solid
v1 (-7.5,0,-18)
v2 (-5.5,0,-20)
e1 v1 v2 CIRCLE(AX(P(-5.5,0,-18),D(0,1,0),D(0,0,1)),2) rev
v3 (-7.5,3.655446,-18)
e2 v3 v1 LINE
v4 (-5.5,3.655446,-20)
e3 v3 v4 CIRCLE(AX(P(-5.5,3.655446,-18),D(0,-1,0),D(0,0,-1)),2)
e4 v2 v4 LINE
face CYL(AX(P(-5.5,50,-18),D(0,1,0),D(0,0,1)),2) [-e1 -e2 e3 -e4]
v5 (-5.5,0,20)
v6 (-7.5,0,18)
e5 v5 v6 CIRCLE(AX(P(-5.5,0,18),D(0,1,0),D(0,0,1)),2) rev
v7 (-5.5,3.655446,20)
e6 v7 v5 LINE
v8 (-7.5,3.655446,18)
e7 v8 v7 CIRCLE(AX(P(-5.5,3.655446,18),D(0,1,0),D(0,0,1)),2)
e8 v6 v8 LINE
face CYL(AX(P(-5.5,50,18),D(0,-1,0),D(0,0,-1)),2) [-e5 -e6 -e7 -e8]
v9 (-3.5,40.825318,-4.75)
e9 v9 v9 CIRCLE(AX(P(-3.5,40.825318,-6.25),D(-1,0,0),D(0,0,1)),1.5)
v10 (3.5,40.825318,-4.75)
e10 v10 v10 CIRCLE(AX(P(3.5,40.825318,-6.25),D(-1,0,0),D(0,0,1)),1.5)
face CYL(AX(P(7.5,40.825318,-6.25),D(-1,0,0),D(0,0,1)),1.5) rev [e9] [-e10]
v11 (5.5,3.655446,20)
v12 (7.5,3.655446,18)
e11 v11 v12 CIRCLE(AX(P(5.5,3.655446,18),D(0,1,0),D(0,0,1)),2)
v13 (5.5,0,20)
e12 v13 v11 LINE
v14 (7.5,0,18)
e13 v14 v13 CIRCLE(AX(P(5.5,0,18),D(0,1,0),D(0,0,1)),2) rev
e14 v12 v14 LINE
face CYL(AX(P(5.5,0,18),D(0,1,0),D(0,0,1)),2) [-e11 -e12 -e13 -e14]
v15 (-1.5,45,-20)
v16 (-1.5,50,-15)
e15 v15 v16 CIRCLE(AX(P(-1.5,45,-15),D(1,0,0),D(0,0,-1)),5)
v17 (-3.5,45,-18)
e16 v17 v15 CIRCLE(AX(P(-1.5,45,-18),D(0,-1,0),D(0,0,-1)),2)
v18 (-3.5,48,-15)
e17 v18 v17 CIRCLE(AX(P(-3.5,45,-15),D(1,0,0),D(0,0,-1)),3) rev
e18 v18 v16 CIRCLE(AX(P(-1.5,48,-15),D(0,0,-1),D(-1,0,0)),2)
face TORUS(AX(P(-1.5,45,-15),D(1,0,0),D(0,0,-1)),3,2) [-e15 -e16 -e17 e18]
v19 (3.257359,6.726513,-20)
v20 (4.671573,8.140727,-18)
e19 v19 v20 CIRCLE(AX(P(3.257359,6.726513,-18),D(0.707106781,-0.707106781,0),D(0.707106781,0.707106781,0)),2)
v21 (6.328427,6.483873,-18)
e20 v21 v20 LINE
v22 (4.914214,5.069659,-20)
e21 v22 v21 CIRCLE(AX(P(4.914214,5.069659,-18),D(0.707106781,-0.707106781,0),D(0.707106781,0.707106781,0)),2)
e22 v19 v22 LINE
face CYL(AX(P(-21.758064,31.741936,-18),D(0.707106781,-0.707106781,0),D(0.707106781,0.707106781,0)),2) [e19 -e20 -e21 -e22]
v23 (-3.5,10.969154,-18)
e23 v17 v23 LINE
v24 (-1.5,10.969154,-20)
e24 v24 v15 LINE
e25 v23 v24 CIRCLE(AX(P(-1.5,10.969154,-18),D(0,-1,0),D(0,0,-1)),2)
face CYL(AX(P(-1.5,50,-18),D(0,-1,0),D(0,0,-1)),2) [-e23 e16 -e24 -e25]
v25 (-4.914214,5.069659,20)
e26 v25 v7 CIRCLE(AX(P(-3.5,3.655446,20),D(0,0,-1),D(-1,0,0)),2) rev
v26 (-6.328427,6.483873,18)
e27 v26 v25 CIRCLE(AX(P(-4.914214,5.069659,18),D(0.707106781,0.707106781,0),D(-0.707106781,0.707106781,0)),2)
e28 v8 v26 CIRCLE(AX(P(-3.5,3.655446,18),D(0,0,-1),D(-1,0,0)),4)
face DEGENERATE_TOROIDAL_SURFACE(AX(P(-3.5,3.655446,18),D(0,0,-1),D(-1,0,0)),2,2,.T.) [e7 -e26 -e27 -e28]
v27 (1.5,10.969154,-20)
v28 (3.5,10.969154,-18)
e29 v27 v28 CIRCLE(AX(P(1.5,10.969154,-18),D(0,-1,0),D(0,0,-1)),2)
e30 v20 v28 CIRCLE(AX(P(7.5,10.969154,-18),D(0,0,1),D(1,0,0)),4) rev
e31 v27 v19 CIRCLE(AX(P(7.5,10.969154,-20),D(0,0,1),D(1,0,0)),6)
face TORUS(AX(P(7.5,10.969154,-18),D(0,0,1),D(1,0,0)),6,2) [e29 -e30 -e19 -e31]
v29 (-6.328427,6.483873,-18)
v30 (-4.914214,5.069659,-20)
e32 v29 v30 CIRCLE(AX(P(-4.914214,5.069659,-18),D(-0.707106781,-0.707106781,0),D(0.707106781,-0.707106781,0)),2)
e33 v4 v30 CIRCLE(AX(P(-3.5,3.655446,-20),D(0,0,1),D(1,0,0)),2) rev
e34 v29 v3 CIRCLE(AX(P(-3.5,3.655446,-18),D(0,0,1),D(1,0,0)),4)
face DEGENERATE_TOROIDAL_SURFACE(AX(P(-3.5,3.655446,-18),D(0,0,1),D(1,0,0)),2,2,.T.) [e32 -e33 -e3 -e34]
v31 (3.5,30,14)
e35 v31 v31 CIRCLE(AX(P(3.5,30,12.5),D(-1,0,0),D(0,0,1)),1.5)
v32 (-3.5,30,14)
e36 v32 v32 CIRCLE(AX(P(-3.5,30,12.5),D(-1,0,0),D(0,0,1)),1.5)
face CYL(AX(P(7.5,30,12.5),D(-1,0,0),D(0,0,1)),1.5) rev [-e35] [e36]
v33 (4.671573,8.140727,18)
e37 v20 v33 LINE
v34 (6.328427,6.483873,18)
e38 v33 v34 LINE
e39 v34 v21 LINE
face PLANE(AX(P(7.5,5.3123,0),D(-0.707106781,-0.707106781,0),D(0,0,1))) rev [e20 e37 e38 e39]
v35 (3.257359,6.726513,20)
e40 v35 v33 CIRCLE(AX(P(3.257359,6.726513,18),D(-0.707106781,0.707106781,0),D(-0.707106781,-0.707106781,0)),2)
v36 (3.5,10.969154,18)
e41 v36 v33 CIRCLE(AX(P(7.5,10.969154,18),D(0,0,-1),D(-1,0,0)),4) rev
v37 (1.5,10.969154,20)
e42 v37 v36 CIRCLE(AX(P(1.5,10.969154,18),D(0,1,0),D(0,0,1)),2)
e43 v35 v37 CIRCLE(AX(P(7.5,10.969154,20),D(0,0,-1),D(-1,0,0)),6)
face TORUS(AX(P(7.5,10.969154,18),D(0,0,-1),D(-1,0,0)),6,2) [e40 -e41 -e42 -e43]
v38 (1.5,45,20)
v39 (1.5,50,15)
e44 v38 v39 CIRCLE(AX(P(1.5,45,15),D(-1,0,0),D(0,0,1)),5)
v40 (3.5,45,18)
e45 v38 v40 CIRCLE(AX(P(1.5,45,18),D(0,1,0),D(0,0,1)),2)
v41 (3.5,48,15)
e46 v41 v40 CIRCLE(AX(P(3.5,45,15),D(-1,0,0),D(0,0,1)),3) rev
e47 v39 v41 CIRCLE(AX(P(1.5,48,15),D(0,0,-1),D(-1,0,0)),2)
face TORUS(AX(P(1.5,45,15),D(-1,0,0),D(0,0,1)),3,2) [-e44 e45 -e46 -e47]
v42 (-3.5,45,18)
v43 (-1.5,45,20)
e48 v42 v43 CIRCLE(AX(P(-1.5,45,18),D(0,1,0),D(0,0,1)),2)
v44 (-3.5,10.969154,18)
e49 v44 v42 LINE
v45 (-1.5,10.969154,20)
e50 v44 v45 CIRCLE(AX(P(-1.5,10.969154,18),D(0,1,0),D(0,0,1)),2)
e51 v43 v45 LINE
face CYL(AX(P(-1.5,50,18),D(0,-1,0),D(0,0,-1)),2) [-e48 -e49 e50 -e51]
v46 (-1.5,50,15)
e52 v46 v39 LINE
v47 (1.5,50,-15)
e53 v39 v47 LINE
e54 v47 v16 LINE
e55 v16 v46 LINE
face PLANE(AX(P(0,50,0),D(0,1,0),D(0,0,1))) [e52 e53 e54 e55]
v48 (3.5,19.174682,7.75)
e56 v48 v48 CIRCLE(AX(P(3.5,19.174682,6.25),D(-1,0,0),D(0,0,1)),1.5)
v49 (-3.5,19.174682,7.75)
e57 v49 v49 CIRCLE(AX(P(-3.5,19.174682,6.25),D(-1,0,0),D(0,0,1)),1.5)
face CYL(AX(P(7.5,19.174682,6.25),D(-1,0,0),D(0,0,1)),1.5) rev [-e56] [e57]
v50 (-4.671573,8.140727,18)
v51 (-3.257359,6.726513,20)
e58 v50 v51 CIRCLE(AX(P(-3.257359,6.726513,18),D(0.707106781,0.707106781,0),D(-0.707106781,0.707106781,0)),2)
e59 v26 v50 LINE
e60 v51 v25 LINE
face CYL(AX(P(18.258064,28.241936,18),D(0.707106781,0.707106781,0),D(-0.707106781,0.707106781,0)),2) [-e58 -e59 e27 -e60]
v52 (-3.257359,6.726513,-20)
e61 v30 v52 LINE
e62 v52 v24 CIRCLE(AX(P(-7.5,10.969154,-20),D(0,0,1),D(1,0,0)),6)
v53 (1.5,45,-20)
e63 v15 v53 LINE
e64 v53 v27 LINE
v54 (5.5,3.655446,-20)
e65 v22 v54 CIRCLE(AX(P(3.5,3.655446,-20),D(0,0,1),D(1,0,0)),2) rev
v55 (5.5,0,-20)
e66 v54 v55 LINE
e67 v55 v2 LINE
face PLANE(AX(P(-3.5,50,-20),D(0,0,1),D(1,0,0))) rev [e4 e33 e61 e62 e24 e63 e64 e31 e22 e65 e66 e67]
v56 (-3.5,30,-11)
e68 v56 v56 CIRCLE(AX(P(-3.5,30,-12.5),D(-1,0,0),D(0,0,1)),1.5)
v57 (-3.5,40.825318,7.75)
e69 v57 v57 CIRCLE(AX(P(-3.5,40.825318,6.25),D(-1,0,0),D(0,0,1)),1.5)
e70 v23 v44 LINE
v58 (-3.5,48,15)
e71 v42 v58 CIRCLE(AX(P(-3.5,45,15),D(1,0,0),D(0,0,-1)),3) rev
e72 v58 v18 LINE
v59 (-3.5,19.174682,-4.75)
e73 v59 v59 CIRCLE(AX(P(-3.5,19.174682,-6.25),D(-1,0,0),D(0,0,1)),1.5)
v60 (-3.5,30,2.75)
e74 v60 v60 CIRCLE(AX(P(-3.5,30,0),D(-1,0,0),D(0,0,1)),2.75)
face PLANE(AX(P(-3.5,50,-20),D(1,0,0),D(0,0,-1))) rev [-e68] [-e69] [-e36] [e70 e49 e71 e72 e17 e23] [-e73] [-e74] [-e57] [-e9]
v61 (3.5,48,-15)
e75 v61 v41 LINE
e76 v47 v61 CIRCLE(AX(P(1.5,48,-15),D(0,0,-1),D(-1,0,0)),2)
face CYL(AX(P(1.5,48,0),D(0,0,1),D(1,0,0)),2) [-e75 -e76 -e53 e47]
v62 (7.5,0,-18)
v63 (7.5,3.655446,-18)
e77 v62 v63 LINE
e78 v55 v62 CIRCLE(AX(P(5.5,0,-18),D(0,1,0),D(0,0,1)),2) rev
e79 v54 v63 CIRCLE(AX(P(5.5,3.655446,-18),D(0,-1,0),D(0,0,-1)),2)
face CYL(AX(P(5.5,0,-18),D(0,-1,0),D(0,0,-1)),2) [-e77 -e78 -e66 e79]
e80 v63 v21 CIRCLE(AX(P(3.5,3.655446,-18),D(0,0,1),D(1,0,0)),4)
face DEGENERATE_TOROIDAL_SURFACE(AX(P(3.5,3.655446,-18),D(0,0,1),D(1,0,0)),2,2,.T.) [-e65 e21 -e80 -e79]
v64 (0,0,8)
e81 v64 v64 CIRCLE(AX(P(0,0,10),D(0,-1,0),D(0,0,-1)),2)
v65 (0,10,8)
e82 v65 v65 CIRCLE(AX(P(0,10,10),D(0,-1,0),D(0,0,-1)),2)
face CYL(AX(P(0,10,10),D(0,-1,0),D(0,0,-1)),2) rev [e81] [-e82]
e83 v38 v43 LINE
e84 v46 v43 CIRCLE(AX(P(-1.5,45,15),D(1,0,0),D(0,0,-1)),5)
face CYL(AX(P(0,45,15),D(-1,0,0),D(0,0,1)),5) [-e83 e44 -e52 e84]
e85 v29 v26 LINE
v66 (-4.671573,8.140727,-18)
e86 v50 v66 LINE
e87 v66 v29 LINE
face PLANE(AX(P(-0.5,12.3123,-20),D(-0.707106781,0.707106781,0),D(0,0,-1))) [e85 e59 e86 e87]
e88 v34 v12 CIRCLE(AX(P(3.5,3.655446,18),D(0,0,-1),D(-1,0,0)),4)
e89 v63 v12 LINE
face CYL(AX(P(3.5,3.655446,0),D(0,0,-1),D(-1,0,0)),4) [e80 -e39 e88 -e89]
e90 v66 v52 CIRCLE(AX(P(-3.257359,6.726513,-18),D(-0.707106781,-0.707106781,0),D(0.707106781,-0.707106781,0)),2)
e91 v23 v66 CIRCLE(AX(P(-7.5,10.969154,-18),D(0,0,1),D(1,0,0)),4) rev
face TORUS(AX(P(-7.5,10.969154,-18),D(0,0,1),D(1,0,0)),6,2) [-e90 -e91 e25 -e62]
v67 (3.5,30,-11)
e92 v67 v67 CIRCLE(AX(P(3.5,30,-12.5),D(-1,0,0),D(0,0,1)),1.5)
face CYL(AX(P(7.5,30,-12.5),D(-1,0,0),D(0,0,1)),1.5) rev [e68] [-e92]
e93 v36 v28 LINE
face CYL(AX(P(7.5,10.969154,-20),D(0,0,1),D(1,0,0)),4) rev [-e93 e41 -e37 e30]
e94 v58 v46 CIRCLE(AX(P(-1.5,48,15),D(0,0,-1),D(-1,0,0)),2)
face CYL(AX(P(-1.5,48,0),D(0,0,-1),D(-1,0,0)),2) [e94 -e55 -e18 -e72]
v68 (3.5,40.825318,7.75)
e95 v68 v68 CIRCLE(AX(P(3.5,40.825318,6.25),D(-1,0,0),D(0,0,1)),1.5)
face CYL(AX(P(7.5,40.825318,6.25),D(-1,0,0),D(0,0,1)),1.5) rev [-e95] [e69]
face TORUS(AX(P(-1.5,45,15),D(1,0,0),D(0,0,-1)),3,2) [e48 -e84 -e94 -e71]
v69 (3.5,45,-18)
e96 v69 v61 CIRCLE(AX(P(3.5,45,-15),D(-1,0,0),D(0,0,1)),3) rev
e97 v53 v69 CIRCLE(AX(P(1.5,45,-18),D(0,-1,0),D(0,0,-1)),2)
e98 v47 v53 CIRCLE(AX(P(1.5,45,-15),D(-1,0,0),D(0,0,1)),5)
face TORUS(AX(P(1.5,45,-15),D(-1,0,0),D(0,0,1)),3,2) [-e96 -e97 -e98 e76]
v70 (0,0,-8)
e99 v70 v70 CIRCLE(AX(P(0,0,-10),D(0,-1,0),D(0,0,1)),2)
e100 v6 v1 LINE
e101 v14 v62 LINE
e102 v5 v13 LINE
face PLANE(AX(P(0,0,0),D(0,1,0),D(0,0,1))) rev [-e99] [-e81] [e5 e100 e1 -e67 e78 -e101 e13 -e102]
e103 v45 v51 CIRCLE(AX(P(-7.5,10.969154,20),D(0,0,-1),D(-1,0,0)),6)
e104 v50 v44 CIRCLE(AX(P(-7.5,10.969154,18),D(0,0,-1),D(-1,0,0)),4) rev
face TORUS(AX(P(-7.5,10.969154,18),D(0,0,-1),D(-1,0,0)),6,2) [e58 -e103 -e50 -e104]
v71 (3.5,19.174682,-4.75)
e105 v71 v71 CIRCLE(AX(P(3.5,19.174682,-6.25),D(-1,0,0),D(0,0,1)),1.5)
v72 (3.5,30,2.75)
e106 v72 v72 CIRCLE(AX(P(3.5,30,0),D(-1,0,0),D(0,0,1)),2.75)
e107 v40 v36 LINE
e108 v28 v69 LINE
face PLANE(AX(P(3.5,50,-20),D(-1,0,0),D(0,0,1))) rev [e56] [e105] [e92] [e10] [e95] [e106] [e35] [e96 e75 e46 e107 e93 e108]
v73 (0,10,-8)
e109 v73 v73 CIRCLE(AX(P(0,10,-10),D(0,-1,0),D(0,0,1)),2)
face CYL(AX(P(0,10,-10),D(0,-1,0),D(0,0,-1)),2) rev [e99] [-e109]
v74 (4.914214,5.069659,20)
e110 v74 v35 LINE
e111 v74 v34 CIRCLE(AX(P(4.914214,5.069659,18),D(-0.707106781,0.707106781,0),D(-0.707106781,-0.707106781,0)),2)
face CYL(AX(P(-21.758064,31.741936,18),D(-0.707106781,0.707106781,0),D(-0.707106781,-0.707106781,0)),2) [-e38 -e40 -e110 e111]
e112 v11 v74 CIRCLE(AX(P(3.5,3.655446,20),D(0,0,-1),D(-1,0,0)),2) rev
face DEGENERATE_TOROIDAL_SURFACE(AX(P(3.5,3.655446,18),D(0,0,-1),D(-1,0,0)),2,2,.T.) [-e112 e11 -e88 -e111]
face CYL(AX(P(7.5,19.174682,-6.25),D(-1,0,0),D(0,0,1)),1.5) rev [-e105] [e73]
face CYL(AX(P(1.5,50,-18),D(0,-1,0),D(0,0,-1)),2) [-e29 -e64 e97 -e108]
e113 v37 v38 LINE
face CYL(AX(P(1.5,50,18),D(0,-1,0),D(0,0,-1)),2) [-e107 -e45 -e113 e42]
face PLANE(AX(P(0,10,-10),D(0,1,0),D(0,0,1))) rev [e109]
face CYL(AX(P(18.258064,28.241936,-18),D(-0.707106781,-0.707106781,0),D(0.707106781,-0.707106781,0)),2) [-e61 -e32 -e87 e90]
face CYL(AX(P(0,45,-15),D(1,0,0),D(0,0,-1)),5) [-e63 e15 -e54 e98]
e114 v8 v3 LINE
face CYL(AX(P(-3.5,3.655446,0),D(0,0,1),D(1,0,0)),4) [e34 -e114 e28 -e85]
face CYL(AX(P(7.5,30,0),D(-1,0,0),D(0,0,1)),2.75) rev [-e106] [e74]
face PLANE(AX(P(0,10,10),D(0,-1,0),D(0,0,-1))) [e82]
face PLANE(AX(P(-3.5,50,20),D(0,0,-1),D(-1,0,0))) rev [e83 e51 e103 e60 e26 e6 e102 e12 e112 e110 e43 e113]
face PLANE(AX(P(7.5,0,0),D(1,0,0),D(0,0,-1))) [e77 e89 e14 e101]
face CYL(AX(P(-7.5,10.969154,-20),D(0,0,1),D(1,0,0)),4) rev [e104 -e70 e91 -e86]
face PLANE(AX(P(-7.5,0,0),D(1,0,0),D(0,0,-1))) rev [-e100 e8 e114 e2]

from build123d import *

# Parameters (mm, degrees)
SKETCH1_W                = 7
SKETCH1_H                = 40
BOSS_EXTRUDE1_DEPTH      = 50
BOSS_EXTRUDE2_DEPTH      = 4
BOSS_EXTRUDE2_DEPTH_BACK = 11
SKETCH3_W                = 40
SKETCH3_H                = 12.312299815
CHAMFER1_SIZE            = 7
FILLET1_R                = 4
SKETCH4_R                = 2
CUT_EXTRUDE2_DEPTH       = 10
SKETCH5_R                = 1.5
SKETCH5_R_2              = 2.75
CUT_EXTRUDE3_DEPTH       = 55.963624335
FILLET2_R                = 5
FILLET3_R                = 2


with BuildPart() as part:
    # Sketch1 → Boss-Extrude1 (new body)
    with BuildSketch(Plane(origin=(0, 0, 0), x_dir=(1, 0, 0), z_dir=(0, 1, 0))):
        Rectangle(SKETCH1_W, SKETCH1_H)
    extrude(amount=BOSS_EXTRUDE1_DEPTH)

    # Sketch3 → Boss-Extrude2 (add, two sides: drawn at the far end of the back side and taken through both)
    with BuildSketch(Plane(origin=(3.5, 0, 0), x_dir=(0, 0, -1), z_dir=(1, 0, 0)).offset(-BOSS_EXTRUDE2_DEPTH_BACK)):
        with Locations((0, 6.156149908)):
            Rectangle(SKETCH3_W, SKETCH3_H)
    extrude(amount=BOSS_EXTRUDE2_DEPTH + BOSS_EXTRUDE2_DEPTH_BACK)

    # Chamfer1
    # the kernel refuses this chamfer: 7 mm, written as the material it takes off along each edge
    with BuildSketch(Plane(origin=(-7.5, 12.312299815, 38.001780916), x_dir=(0.9996219169112968, 0.027495876610586365, 0), z_dir=(0, 0, -1))) as chamfer1_piece_1_section:
        Polygon((CHAMFER1_SIZE * 0.999621916911, CHAMFER1_SIZE * 0.0274958766106), (-CHAMFER1_SIZE * 0.0274958766106, CHAMFER1_SIZE * 0.999621916911), (0, 0), align=None)
    chamfer1_piece_1 = extrude(amount=76.003561832, mode=Mode.PRIVATE)
    chamfer1_piece_1 = split(chamfer1_piece_1, bisect_by=Plane(origin=(-3.5, 9.652025222, 0), z_dir=(-1, 0, 0)), keep=Keep.TOP, mode=Mode.PRIVATE)
    add(chamfer1_piece_1, mode=Mode.SUBTRACT)
    with BuildSketch(Plane(origin=(7.5, 12.312299815, 38.001780916), x_dir=(0.027495876610586365, -0.9996219169112968, 0), z_dir=(0, 0, -1))) as chamfer1_piece_2_section:
        Polygon((CHAMFER1_SIZE * 0.999621916911, CHAMFER1_SIZE * 0.0274958766106), (-CHAMFER1_SIZE * 0.0274958766106, CHAMFER1_SIZE * 0.999621916911), (0, 0), align=None)
    chamfer1_piece_2 = extrude(amount=76.003561832, mode=Mode.PRIVATE)
    chamfer1_piece_2 = split(chamfer1_piece_2, bisect_by=Plane(origin=(3.5, 9.652025222, 0), z_dir=(1, 0, 0)), keep=Keep.TOP, mode=Mode.PRIVATE)
    add(chamfer1_piece_2, mode=Mode.SUBTRACT)

    # Fillet1
    fillet1_edges = [part.edges().sort_by_distance(p)[0] for p in [
        (-7.5, 5.312299815, 0),
        (7.5, 5.312299815, 0),
        (-3.5, 9.312299815, 0),
        (3.5, 9.312299815, 0),
    ]]
    fillet(fillet1_edges, radius=FILLET1_R)

    # Sketch4 → Cut-Extrude2 (cut)
    with BuildSketch(Plane.XZ):
        with Locations(Location((0, 10, 0), (0, 0, 270))):
            Circle(SKETCH4_R)
        with Locations(Location((0, -10, 0), (0, 0, 90))):
            Circle(SKETCH4_R)
    extrude(amount=-CUT_EXTRUDE2_DEPTH, mode=Mode.SUBTRACT)

    # Sketch5 → Cut-Extrude3 (cut, through all)
    with BuildSketch(Plane.ZY.offset(3.5)):
        with Locations((-12.5, 30)):
            Circle(SKETCH5_R)
        with Locations((-6.25, 40.825317547)):
            Circle(SKETCH5_R)
        with Locations((6.25, 40.825317547)):
            Circle(SKETCH5_R)
        with Locations((12.5, 30)):
            Circle(SKETCH5_R)
        with Locations((6.25, 19.174682453)):
            Circle(SKETCH5_R)
        with Locations((-6.25, 19.174682453)):
            Circle(SKETCH5_R)
        with Locations((0, 30)):
            Circle(SKETCH5_R_2)
    extrude(amount=-CUT_EXTRUDE3_DEPTH, mode=Mode.SUBTRACT)

    # Fillet2
    fillet2_edges = [part.edges().sort_by_distance(p)[0] for p in [
        (0, 50, 20),
        (0, 50, -20),
    ]]
    fillet(fillet2_edges, radius=FILLET2_R)

    # Fillet3
    fillet3_edges = [part.edges().sort_by_distance(p)[0] for p in [
        (3.5, 50, 0),
        (-3.5, 50, 0),
        (-3.5, 27.984577032, -20),
        (-3.5, 27.984577032, 20),
        (-3.5, 48.535533906, 18.535533906),
        (-3.5, 48.535533906, -18.535533906),
        (3.5, 27.984577032, -20),
        (3.5, 27.984577032, 20),
        (3.5, 48.535533906, 18.535533906),
        (3.5, 48.535533906, -18.535533906),
        (-7.5, 1.827722783, -20),
        (7.5, 1.827722783, -20),
        (7.5, 1.827722783, 20),
        (-5.5, 7.312299815, 20),
        (-7.5, 1.827722783, 20),
        (5.5, 7.312299815, 20),
        (-7.19551813, 5.186179295, 20),
        (7.19551813, 5.186179295, 20),
        (5.5, 7.312299815, -20),
        (-5.5, 7.312299815, -20),
        (-7.19551813, 5.186179295, -20),
        (7.19551813, 5.186179295, -20),
        (-3.80448187, 9.438420335, 20),
        (-3.80448187, 9.438420335, -20),
        (3.80448187, 9.438420335, -20),
        (3.80448187, 9.438420335, 20),
    ]]
    fillet(fillet3_edges, radius=FILLET3_R)


solid = part.part
